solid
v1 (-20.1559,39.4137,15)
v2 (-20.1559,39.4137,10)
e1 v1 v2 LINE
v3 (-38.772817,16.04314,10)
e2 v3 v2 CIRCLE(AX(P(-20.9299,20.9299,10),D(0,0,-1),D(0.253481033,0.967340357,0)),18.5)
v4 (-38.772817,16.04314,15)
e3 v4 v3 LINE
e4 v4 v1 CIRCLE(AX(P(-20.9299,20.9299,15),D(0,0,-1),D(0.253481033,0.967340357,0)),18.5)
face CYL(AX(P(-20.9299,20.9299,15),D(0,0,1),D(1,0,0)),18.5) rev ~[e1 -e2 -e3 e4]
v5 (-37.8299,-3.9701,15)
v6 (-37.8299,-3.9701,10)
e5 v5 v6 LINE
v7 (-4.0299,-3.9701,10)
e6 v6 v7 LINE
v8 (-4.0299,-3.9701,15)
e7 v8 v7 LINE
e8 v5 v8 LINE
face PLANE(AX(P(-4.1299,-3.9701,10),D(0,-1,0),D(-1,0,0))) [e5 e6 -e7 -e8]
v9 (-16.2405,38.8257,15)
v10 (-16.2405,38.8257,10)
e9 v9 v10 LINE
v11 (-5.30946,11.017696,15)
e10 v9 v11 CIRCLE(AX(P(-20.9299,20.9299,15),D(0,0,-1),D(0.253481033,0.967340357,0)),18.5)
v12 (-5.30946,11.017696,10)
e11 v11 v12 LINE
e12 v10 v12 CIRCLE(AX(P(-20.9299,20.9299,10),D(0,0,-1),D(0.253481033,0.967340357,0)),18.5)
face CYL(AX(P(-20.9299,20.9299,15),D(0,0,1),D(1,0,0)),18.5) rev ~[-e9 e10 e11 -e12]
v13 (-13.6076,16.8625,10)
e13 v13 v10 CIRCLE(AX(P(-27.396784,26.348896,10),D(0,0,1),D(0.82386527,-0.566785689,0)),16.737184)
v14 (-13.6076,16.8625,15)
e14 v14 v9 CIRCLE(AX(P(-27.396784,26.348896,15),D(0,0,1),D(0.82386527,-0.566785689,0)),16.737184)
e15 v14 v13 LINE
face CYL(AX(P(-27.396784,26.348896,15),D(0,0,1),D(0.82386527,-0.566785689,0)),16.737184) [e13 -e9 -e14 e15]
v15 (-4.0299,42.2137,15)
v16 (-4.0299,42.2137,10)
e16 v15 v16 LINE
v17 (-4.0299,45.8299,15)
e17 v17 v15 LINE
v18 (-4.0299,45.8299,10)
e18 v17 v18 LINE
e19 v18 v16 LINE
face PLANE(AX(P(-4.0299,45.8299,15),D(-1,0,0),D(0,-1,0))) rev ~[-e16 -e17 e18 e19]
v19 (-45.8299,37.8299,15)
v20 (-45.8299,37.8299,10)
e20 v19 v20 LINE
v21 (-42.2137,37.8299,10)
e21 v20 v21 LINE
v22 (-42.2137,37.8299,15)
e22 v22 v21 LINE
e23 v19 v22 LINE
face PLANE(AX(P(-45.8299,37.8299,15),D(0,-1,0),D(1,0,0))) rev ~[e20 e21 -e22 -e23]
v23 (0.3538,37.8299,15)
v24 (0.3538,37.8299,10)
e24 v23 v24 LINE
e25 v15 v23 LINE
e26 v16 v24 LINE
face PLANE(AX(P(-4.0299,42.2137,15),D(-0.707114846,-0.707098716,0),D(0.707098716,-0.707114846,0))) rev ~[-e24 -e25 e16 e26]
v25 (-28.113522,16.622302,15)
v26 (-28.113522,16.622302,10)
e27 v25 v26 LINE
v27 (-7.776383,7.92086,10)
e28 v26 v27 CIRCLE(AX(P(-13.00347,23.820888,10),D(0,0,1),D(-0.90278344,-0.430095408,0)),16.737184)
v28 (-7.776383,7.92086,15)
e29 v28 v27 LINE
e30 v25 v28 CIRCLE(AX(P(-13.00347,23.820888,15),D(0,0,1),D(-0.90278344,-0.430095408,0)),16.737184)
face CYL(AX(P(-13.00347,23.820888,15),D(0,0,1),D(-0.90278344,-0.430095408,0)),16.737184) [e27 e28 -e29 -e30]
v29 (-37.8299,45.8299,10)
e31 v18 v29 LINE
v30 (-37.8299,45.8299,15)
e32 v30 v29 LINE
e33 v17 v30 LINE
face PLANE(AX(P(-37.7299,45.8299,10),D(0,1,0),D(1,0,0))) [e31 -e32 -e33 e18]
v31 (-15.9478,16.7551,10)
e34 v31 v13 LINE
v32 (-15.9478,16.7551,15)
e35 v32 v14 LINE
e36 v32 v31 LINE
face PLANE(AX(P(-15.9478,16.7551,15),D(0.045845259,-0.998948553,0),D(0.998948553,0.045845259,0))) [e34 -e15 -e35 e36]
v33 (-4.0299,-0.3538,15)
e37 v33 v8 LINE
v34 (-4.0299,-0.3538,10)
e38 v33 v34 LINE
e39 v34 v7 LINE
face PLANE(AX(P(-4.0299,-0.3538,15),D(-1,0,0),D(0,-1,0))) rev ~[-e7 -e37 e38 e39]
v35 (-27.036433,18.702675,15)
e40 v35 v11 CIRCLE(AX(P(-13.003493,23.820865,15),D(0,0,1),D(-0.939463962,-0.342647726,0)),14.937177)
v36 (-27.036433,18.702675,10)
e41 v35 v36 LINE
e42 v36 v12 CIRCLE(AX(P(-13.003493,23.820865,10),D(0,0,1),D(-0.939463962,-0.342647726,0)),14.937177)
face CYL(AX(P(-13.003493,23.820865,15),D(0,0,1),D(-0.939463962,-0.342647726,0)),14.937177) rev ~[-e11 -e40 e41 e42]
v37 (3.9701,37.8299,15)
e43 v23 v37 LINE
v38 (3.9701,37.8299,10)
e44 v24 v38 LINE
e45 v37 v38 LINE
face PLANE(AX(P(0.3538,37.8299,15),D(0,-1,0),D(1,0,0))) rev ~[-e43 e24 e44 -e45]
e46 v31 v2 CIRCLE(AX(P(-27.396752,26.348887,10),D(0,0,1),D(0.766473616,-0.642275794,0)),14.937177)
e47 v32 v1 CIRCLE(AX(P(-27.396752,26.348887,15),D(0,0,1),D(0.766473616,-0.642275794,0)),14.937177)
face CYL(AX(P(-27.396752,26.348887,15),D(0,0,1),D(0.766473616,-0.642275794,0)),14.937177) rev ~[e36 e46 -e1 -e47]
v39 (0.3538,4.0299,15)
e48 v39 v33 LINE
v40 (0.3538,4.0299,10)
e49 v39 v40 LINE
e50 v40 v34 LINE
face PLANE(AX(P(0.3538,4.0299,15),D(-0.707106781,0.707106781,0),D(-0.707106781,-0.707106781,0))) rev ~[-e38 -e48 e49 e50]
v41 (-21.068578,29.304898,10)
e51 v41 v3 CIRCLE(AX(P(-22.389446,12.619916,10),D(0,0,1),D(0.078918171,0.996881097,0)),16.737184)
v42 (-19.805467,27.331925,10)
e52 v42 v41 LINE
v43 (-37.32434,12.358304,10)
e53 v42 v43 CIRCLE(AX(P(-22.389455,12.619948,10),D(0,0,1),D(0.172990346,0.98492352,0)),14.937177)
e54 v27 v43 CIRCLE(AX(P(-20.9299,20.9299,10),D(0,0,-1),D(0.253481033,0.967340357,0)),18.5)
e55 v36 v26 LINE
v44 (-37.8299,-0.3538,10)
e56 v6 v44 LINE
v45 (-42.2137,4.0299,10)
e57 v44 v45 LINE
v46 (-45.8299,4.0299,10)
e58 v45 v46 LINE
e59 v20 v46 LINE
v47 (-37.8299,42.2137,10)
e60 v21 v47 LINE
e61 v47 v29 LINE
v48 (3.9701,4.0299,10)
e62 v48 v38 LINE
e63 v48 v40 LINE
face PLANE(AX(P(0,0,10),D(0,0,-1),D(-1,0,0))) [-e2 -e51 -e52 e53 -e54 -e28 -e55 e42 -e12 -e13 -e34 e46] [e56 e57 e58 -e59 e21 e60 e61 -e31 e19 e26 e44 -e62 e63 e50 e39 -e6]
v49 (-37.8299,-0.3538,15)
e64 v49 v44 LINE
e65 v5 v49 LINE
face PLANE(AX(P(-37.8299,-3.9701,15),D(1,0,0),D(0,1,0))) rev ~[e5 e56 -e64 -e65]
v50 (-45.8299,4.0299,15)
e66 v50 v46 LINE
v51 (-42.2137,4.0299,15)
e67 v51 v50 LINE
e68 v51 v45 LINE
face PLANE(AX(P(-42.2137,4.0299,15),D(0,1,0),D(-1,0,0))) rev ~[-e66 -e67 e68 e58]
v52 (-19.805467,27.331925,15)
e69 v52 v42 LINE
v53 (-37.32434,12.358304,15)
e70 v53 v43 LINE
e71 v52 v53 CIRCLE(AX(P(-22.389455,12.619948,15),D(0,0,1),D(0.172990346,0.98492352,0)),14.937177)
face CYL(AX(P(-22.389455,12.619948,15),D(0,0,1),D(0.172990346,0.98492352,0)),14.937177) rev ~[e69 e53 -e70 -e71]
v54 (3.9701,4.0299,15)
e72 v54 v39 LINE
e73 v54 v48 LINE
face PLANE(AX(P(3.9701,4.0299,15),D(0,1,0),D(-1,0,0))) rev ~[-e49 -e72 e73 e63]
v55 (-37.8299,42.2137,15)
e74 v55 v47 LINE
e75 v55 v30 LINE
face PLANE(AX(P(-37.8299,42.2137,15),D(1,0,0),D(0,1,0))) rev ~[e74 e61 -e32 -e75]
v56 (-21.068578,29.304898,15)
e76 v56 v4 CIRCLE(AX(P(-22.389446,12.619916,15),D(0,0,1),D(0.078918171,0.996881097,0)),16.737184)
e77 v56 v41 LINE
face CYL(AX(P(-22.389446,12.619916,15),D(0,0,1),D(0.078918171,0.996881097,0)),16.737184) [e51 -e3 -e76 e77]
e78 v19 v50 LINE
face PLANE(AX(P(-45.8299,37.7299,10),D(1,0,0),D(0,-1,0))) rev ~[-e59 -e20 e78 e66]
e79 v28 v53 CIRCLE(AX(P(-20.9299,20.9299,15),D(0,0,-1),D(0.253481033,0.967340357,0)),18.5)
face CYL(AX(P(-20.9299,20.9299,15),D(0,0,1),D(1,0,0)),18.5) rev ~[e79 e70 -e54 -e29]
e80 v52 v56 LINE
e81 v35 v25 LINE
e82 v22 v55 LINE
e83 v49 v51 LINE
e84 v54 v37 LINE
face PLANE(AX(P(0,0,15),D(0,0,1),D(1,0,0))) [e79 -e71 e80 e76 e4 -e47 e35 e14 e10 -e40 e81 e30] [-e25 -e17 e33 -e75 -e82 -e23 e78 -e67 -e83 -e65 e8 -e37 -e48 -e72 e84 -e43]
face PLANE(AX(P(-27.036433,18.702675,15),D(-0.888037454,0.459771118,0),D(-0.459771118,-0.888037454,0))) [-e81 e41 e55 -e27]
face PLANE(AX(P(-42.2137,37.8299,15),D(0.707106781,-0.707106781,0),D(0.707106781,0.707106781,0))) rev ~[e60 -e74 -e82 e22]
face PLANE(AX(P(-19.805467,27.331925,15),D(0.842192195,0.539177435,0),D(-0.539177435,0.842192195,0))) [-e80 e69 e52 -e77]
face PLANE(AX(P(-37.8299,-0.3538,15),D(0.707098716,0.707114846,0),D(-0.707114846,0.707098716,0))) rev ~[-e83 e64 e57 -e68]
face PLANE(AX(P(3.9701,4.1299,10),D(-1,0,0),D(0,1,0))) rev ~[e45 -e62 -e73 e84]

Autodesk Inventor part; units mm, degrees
ref_plane "YZ Plane" through (0, 0, 0) normal (1, 0, 0) x (0, 1, 0)
ref_plane "Work Plane1" through (0, 0, 10) normal (0, 0, 1) x (1, 0, 0)
sketch "Sketch1" plane through (0, 0, 10) normal (0, 0, 1) x (1, 0, 0)
  line L0 (-4.0299, -0.3538) -> (-2.2322, 1.4439) construction
  arc A0 (-1.4439, 2.2322) -> (-2.2322, 1.4439) centre (-0.9299, 0.9299) ccw construction
  line L1 (-1.4439, 2.2322) -> (0.3538, 4.0299) construction
  line L2 (-37.8299, 42.2137) -> (-37.8299, 45.8299) construction
  line L3 (-37.8299, 45.8299) -> (-4.0299, 45.8299) construction
  line L4 (-4.0299, 45.8299) -> (-4.0299, 42.2137) construction
  line L5 (-4.0299, 4.0299) -> (0.3538, 4.0299) projected
  line L6 (-20.9299, 58.9723) -> (17.1124, 20.9299) construction
  line L7 (17.1124, 20.9299) -> (-20.9299, -17.1124) construction
  line L8 (-20.9299, -17.1124) -> (-58.9723, 20.9299) construction
  line L9 (-58.9723, 20.9299) -> (-20.9299, 58.9723) construction
  line L10 (-20.9299, 58.9723) -> (-20.9299, -17.1124) construction
  line L11 (17.1124, 20.9299) -> (-58.9723, 20.9299) construction
  line L12 (-20.9299, 58.9723) -> (32.8701, 58.9723) construction
  line L13 (-43.4299, 43.4299) -> (1.5701, 43.4299) construction
  line L14 (1.5701, 43.4299) -> (1.5701, -1.5701) construction
  line L15 (1.5701, -1.5701) -> (-43.4299, -1.5701) construction
  line L16 (-43.4299, -1.5701) -> (-43.4299, 43.4299) construction
  line L17 (-43.4299, 43.4299) -> (1.5701, -1.5701) construction
  line L18 (1.5701, 43.4299) -> (-43.4299, -1.5701) construction
  line L19 (-43.4299, 5.3876) -> (-43.4299, 36.4723)
  line L20 (-43.4299, 36.4723) -> (-36.4723, 43.4299)
  line L21 (-36.4723, 43.4299) -> (-5.3876, 43.4299)
  line L22 (-5.3876, 43.4299) -> (1.5701, 36.4723)
  line L23 (1.5701, 36.4723) -> (1.5701, 5.3876)
  line L24 (1.5701, 5.3876) -> (-5.3876, -1.5701)
  line L25 (-5.3876, -1.5701) -> (-36.4723, -1.5701)
  line L26 (-36.4723, -1.5701) -> (-43.4299, 5.3876)
  line L27 (-4.0299, 42.2137) -> (-37.8299, 42.2137) projected
  line L28 (-4.0299, -0.3538) -> (-4.0299, 4.0299) projected
  circle A1 centre (-20.9299, 20.9299) radius 13.3985
  circle A2 centre (-20.9299, 20.9299) radius 15.4895
  point P0 (-37.8299, 4.0299)
  dimension "d18" = 53.8
  dimension "d19" = 45
  dimension "d20" = 53.8
  dimension "d21" = 45
  dimension "d22" = 45
  dimension "d30" = 26.797
  dimension "d36" = 30.979
extrude "Extrusion1" add sketch "Sketch1" along normal blind 5 contours L28 L24 L25 L26 L19 L20 L27 L22 L23 L5 | L5 L24 L28 | L27 L20 L21 L22 | A1 | A2
ref_plane "Work Plane2" through (-40.9959, 0.8639, 22.2359) normal (0, 0, 1) x (1, 0, 0)
sketch "Sketch3" plane through (0, 0, 10) normal (0, 0, -1) x (-1, 0, 0)
  line L0 (37.8299, -0.4701) -> (37.8299, 4.0299) construction
  line L1 (4.0299, 4.0299) -> (4.0299, -0.4701) construction
  line L2 (37.8299, -0.4701) -> (37.8299, 1.1886) construction
  line L3 (4.0299, -3.9701) -> (4.0299, -0.3538) construction
  line L4 (45.8299, 4.0299) -> (42.2137, 4.0299) construction
  line L5 (-0.3538, 4.0299) -> (-3.9701, 4.0299) construction
  line L6 (-3.9701, 37.8299) -> (-0.3538, 37.8299) construction
  line L7 (4.0299, 42.2137) -> (4.0299, 45.8299) construction
  line L8 (37.8299, 45.8299) -> (37.8299, 42.2137) construction
  line L9 (42.2137, 37.8299) -> (45.8299, 37.8299) construction
  line L10 (37.8299, 37.7299) -> (45.8299, 37.7299)
  line L11 (45.8299, 37.7299) -> (45.8299, 4.1299)
  line L12 (45.8299, 4.1299) -> (37.8299, 4.1299)
  line L13 (37.8299, 4.1299) -> (37.8299, 37.7299)
  line L14 (37.7299, 4.0299) -> (4.1299, 4.0299)
  line L15 (4.1299, 4.0299) -> (4.1299, -3.9701)
  line L16 (4.1299, -3.9701) -> (37.7299, -3.9701)
  line L17 (37.7299, -3.9701) -> (37.7299, 4.0299)
  line L18 (4.0299, 4.1299) -> (-3.9701, 4.1299)
  line L19 (-3.9701, 4.1299) -> (-3.9701, 37.7299)
  line L20 (-3.9701, 37.7299) -> (4.0299, 37.7299)
  line L21 (4.0299, 37.7299) -> (4.0299, 4.1299)
  line L22 (4.1299, 37.8299) -> (37.7299, 37.8299)
  line L23 (37.7299, 37.8299) -> (37.7299, 45.8299)
  line L24 (37.7299, 45.8299) -> (4.1299, 45.8299)
  line L25 (4.1299, 45.8299) -> (4.1299, 37.8299)
  point P0 (0, 0)
  dimension "d23" = 0.1
  dimension "d24" = 0.1
  dimension "d25" = 0.1
  dimension "d26" = 0.1
  dimension "d27" = 0.1
extrude "Extrusion3" add sketch "Sketch3" against normal up to surface (5 mm away)
sketch "Sketch6" plane through (0, 0, 15) normal (0, 0, 1) x (1, 0, 0)
  circle A0 centre (-20.9299, 20.9299) radius 18.5
  circle A1 centre (-20.9299, 20.9299) radius 13.3985
  line L0 (-45.8299, 4.1299) -> (-45.8299, 37.7299) projected
  line L1 (-4.1299, -3.9701) -> (-37.7299, -3.9701) projected
  line L2 (-37.7299, 45.8299) -> (-4.1299, 45.8299) projected
  point P0 (0, 0)
  point P1 (-45.8299, 20.9299)
  point P2 (-20.9299, -3.9701)
  point P3 (-20.9299, 45.8299)
  dimension "d37" = 26.797
  dimension "d38" = 37
extrude "Extrusion5" cut sketch "Sketch6" against normal blind 12 contours A0 | A1
sketch "Sketch7" plane through (0, 0, 15) normal (0, 0, 1) x (1, 0, 0)
  arc A0 (-7.3514, 4.1907) -> (-4.1915, 7.0829) centre (-15.9478, 16.7551) ccw
  arc A1 (-7.3514, 4.1907) -> (-4.1915, 7.0829) centre (-15.9478, 16.7551) ccw
  circle A2 centre (-20.9299, 20.9299) radius 18.5 construction
  circle A3 centre (-20.9299, 20.9299) radius 6.5 construction
  arc A4 (-15.9478, 16.7551) -> (-20.1559, 39.4137) centre (-27.3968, 26.3489) ccw
  arc A5 (-13.6076, 16.8625) -> (-16.2405, 38.8257) centre (-27.3968, 26.3489) ccw
  arc A6 (-16.2405, 38.8257) -> (-20.1559, 39.4137) centre (-20.9299, 20.9299) ccw
  line L0 (-15.9478, 16.7551) -> (-13.6076, 16.8625)
  point P0 (0, 0)
  point P1 (-25.3654, 35.7708)
  point P2 (-14.2, -44.8454)
  point P3 (-13.5804, 16.4347)
  point P4 (-13.5804, 8.5029)
  dimension "d79" = 13
  dimension "d83" = 1.8
extrude "Extrusion6" add sketch "Sketch7" against normal up to surface (5 mm away)
pattern_circular "Circular Pattern1" count 3 over 360 about axis through (-20.9299, 20.9299, 15) along (0, 0, -1) of "Extrusion6"
sketch "Skizze11" plane through (0, 0, 15) normal (0, 0, 1) x (1, 0, 0)
  arc A0 (-5.3095, 11.0177) -> (-16.2405, 38.8257) centre (-20.9299, 20.9299) ccw construction
  arc A1 (-27.0364, 18.7027) -> (-5.3095, 11.0177) centre (-13.0035, 23.8209) ccw construction
  line L0 (-28.1135, 16.6223) -> (-27.0364, 18.7027) construction
  arc A2 (-28.1135, 16.6223) -> (-7.7764, 7.9209) centre (-13.0035, 23.8209) ccw construction
  arc A3 (-37.3244, 12.3584) -> (-7.7764, 7.9209) centre (-20.9299, 20.9299) ccw construction
  arc A4 (-19.8055, 27.3319) -> (-37.3244, 12.3584) centre (-22.3895, 12.6199) ccw construction
  line L1 (-21.0686, 29.3049) -> (-19.8055, 27.3319) construction
  arc A5 (-21.0686, 29.3049) -> (-38.7728, 16.0432) centre (-22.3895, 12.6199) ccw construction
  arc A6 (-20.1559, 39.4137) -> (-38.7728, 16.0432) centre (-20.9299, 20.9299) ccw construction
  arc A7 (-15.9478, 16.7551) -> (-20.1559, 39.4137) centre (-27.3968, 26.3489) ccw construction
  line L2 (-13.6076, 16.8625) -> (-15.9478, 16.7551) construction
  arc A8 (-13.6076, 16.8625) -> (-16.2405, 38.8257) centre (-27.3968, 26.3489) ccw construction
  line L3 (3.9701, 4.1299) -> (0.3124, 4.1299) projected
  line L4 (3.9701, 37.7299) -> (3.9701, 4.1299) construction
  line L5 (0.3124, 37.7299) -> (3.9701, 37.7299) projected
  line L6 (0.3124, 37.7299) -> (-4.1299, 42.1723) projected
  line L7 (-4.1299, 45.8299) -> (-4.1299, 42.1723) projected
  line L8 (-37.7299, 45.8299) -> (-4.1299, 45.8299) construction
  line L9 (-37.7299, 42.1723) -> (-37.7299, 45.8299) projected
  line L10 (-37.7299, 42.1723) -> (-42.1723, 37.7299) projected
  line L11 (-45.8299, 37.7299) -> (-42.1723, 37.7299) projected
  line L12 (-45.8299, 4.1299) -> (-45.8299, 37.7299) construction
  line L13 (-42.1723, 4.1299) -> (-45.8299, 4.1299) projected
  line L14 (-42.1723, 4.1299) -> (-37.7299, -0.3124) projected
  line L15 (-37.7299, -3.9701) -> (-37.7299, -0.3124) projected
  line L16 (-4.1299, -3.9701) -> (-37.7299, -3.9701) construction
  line L17 (-4.1299, -0.3124) -> (-4.1299, -3.9701) projected
  line L18 (-4.1299, -0.3124) -> (0.3124, 4.1299) projected
  line L19 (-4.0299, 45.9299) -> (-4.0299, 42.2137)
  line L20 (-4.0299, 42.2137) -> (0.3538, 37.8299)
  line L21 (0.3538, 37.8299) -> (4.0701, 37.8299)
  line L22 (4.0701, 37.8299) -> (4.0701, 4.0299) construction
  line L23 (4.0701, 4.0299) -> (0.3538, 4.0299)
  line L24 (0.3538, 4.0299) -> (-4.0299, -0.3538)
  line L25 (-4.0299, -0.3538) -> (-4.0299, -4.0701)
  line L26 (-4.0299, -4.0701) -> (-37.8299, -4.0701) construction
  line L27 (-37.8299, -4.0701) -> (-37.8299, -0.3538)
  line L28 (-37.8299, -0.3538) -> (-42.2137, 4.0299)
  line L29 (-42.2137, 4.0299) -> (-45.9299, 4.0299)
  line L30 (-45.9299, 4.0299) -> (-45.9299, 37.8299) construction
  line L31 (-45.9299, 37.8299) -> (-42.2137, 37.8299)
  line L32 (-42.2137, 37.8299) -> (-37.8299, 42.2137)
  line L33 (-37.8299, 42.2137) -> (-37.8299, 45.9299)
  line L34 (-37.8299, 45.9299) -> (-4.0299, 45.9299) construction
  line L35 (-45.8299, 37.7299) -> (-45.8299, 37.8299)
  line L36 (-37.7299, 45.8299) -> (-37.8299, 45.8299)
  line L37 (-4.1299, 45.8299) -> (-4.0299, 45.8299)
  line L38 (3.9701, 37.7299) -> (3.9701, 37.8299)
  line L39 (3.9701, 37.7299) -> (3.9701, 4.1299) projected
  line L40 (3.9701, 4.1299) -> (3.9701, 4.0299)
  line L41 (-4.1299, -3.9701) -> (-4.0299, -3.9701)
  line L42 (-37.7299, -3.9701) -> (-37.8299, -3.9701)
  line L43 (-45.8299, 4.1299) -> (-45.8299, 4.0299)
  point P0 (0, 0)
  dimension "d84" = 0.1
extrude "IM_offset" add sketch "Skizze11" against normal up to surface (5 mm away)
properties part number "20_Cube_Insert_Objective_Holder_v3"
